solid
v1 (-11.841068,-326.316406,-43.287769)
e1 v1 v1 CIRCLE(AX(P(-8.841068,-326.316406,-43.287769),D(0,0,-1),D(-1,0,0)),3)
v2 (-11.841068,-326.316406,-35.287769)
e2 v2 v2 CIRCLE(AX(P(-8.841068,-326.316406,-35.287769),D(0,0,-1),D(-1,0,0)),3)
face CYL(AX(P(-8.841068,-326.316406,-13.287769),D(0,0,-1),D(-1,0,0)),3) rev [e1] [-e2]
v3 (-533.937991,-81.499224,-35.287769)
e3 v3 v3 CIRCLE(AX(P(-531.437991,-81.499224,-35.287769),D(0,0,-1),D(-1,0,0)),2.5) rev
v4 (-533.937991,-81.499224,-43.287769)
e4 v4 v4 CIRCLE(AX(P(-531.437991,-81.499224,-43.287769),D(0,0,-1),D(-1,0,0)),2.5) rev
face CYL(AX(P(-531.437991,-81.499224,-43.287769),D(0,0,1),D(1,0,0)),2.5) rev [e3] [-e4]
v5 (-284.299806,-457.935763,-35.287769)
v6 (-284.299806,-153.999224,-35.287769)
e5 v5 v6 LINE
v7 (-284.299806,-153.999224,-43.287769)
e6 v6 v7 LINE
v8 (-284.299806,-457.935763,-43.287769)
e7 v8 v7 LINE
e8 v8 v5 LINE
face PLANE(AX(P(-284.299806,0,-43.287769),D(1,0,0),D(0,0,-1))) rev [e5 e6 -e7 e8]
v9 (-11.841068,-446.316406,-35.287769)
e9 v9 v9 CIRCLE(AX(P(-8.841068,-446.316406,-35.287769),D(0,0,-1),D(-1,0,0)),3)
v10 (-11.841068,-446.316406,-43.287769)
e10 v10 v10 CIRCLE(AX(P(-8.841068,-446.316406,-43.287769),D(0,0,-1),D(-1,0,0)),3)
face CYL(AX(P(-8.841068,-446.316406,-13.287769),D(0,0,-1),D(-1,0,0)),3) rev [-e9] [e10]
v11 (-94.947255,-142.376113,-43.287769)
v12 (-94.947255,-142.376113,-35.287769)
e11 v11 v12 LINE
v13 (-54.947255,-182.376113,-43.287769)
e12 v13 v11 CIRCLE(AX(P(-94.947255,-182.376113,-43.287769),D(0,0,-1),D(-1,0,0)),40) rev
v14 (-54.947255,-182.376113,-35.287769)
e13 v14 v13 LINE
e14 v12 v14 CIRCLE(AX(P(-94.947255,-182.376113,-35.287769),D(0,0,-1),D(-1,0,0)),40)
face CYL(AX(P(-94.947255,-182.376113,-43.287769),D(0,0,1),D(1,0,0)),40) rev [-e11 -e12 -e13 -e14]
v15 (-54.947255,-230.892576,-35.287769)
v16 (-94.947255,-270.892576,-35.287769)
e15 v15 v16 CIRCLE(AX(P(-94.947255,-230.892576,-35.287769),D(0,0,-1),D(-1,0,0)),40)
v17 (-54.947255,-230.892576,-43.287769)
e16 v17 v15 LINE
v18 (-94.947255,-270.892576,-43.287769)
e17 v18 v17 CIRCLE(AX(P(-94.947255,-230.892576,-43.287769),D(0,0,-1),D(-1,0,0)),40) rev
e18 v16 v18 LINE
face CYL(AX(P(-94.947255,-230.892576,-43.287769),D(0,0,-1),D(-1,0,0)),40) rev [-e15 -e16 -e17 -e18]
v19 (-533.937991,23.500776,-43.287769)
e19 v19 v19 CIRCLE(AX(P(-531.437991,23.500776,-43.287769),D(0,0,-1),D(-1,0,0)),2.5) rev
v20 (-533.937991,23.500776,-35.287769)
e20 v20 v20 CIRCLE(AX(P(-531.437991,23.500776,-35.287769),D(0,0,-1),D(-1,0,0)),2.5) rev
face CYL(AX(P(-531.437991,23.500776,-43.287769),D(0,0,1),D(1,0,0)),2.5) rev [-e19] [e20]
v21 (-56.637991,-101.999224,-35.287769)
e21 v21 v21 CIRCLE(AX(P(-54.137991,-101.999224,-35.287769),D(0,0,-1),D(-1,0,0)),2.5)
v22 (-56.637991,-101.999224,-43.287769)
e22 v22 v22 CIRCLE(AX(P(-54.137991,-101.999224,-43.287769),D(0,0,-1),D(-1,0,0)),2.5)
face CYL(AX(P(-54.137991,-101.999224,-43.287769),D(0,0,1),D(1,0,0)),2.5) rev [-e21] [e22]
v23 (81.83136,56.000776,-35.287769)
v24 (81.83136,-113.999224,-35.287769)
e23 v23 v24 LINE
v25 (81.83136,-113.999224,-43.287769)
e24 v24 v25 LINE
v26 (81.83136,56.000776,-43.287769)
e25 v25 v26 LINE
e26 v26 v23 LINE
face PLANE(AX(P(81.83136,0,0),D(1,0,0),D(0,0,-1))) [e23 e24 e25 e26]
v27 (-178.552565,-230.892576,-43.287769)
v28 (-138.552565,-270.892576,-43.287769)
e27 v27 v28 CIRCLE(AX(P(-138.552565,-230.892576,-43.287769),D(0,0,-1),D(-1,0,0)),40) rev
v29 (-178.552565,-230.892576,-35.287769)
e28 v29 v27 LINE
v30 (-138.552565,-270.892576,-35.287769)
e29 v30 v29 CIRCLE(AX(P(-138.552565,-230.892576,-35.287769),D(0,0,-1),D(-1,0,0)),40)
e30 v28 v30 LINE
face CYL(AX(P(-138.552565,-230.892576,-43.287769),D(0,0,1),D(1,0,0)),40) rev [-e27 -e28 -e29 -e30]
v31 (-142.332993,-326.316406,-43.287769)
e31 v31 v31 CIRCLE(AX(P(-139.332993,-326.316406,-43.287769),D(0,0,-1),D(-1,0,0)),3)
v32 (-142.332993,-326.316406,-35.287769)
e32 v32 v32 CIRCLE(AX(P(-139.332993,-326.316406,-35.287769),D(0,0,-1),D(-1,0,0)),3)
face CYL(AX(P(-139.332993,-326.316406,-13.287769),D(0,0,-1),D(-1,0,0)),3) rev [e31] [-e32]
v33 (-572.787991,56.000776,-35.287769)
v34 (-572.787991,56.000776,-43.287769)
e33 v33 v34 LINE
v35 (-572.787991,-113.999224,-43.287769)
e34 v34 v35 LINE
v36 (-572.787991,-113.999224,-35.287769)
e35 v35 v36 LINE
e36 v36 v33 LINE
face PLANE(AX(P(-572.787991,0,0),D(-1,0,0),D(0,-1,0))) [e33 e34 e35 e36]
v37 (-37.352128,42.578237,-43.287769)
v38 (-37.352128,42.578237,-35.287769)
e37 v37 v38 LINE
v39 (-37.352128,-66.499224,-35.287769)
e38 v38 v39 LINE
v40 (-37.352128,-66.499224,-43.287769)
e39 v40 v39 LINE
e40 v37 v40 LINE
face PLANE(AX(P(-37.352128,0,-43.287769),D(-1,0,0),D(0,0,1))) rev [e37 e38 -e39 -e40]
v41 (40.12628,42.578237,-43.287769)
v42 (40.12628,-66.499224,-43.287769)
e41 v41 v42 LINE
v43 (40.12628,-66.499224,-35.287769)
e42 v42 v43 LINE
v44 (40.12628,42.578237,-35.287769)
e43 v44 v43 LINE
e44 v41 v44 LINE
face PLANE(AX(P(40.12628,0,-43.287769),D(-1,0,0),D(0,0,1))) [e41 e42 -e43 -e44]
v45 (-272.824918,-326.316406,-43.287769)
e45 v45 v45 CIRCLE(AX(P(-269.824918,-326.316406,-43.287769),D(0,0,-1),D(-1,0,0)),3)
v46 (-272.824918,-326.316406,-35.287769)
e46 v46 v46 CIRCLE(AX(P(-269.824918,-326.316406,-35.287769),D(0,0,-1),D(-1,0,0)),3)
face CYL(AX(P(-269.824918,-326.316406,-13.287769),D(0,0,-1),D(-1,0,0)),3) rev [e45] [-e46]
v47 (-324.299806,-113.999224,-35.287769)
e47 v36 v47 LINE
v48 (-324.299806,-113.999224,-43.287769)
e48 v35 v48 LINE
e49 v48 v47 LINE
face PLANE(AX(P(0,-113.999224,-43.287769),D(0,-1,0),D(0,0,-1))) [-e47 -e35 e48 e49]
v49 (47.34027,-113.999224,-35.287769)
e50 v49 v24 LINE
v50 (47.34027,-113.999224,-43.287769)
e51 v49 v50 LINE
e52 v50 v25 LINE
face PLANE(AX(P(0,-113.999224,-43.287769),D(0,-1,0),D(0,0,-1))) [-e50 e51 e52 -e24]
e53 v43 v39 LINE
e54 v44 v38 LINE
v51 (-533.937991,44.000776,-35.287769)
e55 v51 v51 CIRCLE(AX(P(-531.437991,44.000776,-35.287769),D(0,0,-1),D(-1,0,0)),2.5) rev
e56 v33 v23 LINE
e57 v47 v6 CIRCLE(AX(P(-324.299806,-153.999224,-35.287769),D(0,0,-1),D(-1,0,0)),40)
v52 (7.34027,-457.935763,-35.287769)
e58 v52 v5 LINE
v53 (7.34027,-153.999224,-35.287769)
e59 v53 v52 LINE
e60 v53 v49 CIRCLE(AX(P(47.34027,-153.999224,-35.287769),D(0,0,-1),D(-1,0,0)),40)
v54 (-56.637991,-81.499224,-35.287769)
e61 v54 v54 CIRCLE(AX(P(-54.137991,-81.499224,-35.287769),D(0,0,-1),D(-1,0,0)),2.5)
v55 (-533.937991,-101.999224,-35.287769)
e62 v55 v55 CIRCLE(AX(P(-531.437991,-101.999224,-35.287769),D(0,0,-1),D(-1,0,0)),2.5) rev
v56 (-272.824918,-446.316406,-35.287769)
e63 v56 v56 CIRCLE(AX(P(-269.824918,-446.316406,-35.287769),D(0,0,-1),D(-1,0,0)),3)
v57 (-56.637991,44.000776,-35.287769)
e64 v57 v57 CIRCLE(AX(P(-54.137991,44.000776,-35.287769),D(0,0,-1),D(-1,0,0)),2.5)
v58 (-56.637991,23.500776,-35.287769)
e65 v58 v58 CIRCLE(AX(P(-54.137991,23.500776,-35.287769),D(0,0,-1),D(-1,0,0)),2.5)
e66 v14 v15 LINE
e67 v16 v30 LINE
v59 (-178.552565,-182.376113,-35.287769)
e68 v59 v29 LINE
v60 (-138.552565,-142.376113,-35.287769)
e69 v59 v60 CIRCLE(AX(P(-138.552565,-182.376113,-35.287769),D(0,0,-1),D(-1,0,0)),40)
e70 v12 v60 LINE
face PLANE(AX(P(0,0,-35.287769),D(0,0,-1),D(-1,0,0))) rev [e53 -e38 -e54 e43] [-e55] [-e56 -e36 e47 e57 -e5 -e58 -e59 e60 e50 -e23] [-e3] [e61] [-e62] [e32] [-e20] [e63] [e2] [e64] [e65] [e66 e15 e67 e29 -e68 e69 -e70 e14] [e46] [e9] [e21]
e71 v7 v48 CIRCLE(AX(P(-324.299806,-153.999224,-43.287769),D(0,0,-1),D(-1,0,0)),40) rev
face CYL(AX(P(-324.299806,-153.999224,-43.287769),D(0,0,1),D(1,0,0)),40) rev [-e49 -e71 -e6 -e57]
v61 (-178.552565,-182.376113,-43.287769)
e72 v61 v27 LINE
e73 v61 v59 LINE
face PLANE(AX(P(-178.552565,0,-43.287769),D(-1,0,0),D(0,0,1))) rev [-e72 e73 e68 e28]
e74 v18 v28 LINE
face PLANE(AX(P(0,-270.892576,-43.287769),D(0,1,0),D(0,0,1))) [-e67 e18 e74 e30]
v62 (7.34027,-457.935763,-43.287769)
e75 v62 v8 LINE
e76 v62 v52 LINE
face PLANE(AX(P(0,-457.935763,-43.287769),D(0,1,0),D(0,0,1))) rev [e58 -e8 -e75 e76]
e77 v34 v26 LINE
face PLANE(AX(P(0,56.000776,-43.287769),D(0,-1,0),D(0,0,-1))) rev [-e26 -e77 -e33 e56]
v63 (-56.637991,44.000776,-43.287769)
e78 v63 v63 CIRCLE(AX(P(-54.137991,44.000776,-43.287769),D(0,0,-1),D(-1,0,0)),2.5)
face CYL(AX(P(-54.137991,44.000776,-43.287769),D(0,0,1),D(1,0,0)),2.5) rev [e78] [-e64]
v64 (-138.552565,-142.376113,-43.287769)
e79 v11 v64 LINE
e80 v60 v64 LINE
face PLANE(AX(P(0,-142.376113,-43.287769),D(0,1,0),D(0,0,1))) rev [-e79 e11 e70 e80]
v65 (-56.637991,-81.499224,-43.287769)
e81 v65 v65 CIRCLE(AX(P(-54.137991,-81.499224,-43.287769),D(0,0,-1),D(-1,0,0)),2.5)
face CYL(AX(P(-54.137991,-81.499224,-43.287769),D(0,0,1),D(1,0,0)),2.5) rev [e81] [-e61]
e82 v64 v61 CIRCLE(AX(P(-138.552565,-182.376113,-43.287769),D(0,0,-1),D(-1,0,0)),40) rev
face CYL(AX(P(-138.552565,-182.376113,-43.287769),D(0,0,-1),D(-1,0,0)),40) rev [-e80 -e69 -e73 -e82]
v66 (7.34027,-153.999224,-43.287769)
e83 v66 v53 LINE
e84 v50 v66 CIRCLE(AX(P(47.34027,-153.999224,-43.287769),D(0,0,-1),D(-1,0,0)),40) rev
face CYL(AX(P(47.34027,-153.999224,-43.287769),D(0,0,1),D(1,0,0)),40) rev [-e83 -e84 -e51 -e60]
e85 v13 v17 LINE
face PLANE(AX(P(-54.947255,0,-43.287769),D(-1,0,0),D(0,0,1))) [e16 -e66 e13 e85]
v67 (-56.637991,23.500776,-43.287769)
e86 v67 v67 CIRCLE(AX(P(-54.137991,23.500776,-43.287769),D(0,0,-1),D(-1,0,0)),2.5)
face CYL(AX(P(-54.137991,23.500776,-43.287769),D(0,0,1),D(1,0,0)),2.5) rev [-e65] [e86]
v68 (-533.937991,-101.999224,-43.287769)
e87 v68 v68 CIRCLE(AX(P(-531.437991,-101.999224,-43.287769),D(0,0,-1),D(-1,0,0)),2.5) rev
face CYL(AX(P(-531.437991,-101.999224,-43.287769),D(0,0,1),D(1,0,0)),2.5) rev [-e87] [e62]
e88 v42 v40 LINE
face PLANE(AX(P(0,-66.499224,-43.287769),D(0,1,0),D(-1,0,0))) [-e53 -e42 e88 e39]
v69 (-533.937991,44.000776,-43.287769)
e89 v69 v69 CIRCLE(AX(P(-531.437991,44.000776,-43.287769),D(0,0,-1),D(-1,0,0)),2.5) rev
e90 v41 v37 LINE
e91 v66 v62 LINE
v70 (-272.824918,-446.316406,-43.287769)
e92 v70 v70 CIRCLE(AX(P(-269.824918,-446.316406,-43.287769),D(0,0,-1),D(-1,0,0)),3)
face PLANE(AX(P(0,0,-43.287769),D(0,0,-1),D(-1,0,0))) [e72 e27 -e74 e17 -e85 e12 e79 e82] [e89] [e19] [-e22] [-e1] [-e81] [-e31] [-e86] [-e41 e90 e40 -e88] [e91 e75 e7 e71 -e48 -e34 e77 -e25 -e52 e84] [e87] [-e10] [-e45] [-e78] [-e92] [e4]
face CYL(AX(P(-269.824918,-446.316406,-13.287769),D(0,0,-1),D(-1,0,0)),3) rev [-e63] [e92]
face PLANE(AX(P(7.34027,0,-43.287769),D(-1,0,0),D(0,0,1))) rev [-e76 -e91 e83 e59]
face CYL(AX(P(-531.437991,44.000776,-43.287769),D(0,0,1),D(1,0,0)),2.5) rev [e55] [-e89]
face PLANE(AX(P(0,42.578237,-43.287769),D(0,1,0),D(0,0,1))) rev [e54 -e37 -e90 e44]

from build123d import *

# Parameters (mm, degrees)
CROQUIS1_R              = 2.5
CROQUIS1_W              = 77.478408342
CROQUIS1_H              = 109.077461589
CROQUIS1_W_2            = 123.605310211
CROQUIS1_H_2            = 128.516462854
SALIENTE_EXTRUIR1_DEPTH = 8
REDONDEO1_R             = 40
CROQUIS2_W              = 8
CROQUIS2_H              = 170
SALIENTE_EXTRUIR2_DEPTH = 5
CROQUIS3_W              = 8
CROQUIS3_H              = 170
SALIENTE_EXTRUIR3_DEPTH = 30
CROQUIS4_W              = 8
CROQUIS4_H              = 170
SALIENTE_EXTRUIR4_DEPTH = 30
CROQUIS5_R              = 3
CORTAR_EXTRUIR1_DEPTH   = 30


with BuildPart() as part:
    # Croquis1 → Saliente-Extruir1 (new body)
    with BuildSketch(Plane(origin=(0, 0, -35.287768798), x_dir=(-1, 0, 0), z_dir=(0, 0, -1))):
        Polygon((537.787991057, -113.999224426), (537.787991057, 56.000775574), (-51.831359741, 56.000775574), (-51.831359741, -113.999224426), (-7.340270166, -113.999224426), (-7.340270166, -457.935763063), (284.299805756, -457.935763063), (284.299805756, -113.999224426), align=None)
        with Locations((531.437991057, -101.999224426)):
            Circle(CROQUIS1_R, mode=Mode.SUBTRACT)
        with Locations((531.437991057, -81.499224426)):
            Circle(CROQUIS1_R, mode=Mode.SUBTRACT)
        with Locations((531.437991057, 23.500775574)):
            Circle(CROQUIS1_R, mode=Mode.SUBTRACT)
        with Locations((531.437991057, 44.000775574)):
            Circle(CROQUIS1_R, mode=Mode.SUBTRACT)
        with Locations((54.137991057, 44.000775574)):
            Circle(CROQUIS1_R, mode=Mode.SUBTRACT)
        with Locations((54.137991057, -101.999224426)):
            Circle(CROQUIS1_R, mode=Mode.SUBTRACT)
        with Locations((54.137991057, -81.499224426)):
            Circle(CROQUIS1_R, mode=Mode.SUBTRACT)
        with Locations((-1.387076296, -11.960493631)):
            Rectangle(CROQUIS1_W, CROQUIS1_H, mode=Mode.SUBTRACT)
        with Locations((54.137991057, 23.500775574)):
            Circle(CROQUIS1_R, mode=Mode.SUBTRACT)
        with Locations((116.749910344, -206.634344557)):
            Rectangle(CROQUIS1_W_2, CROQUIS1_H_2, mode=Mode.SUBTRACT)
    extrude(amount=SALIENTE_EXTRUIR1_DEPTH)

    # Redondeo1
    redondeo1_edges = [part.edges().sort_by_distance(p)[0] for p in [
        (-54.947255239, -270.892575984, -39.287768798),
        (-178.55256545, -270.892575984, -39.287768798),
        (-178.55256545, -142.37611313, -39.287768798),
        (-54.947255239, -142.37611313, -39.287768798),
        (7.340270166, -113.999224426, -39.287768798),
        (-284.299805756, -113.999224426, -39.287768798),
    ]]
    fillet(redondeo1_edges, radius=REDONDEO1_R)

    # Croquis2 → Saliente-Extruir2 (add)
    with BuildSketch(Plane.ZY.offset(537.787991057)):
        with Locations((-39.287768798, -28.999224426)):
            Rectangle(CROQUIS2_W, CROQUIS2_H)
    extrude(amount=SALIENTE_EXTRUIR2_DEPTH)

    # Croquis3 → Saliente-Extruir3 (add)
    with BuildSketch(Plane.ZY.offset(542.787991057)):
        with Locations((-39.287768798, -28.999224426)):
            Rectangle(CROQUIS3_W, CROQUIS3_H)
    extrude(amount=SALIENTE_EXTRUIR3_DEPTH)

    # Croquis4 → Saliente-Extruir4 (add)
    with BuildSketch(Plane(origin=(51.831359741, 0, 0), x_dir=(0, 0, -1), z_dir=(1, 0, 0))):
        with Locations((39.287768798, -28.999224426)):
            Rectangle(CROQUIS4_W, CROQUIS4_H)
    extrude(amount=SALIENTE_EXTRUIR4_DEPTH)

    # Croquis5 → Cortar-Extruir1 (cut)
    with BuildSketch(Plane(origin=(0, 0, -43.287768798), x_dir=(-1, 0, 0), z_dir=(0, 0, -1))):
        with Locations((8.841068429, -446.316406302)):
            Circle(CROQUIS5_R)
        with Locations((8.841068429, -326.316406302)):
            Circle(CROQUIS5_R)
        with Locations((139.33299328, -326.316406302)):
            Circle(CROQUIS5_R)
        with Locations((269.824918132, -326.316406302)):
            Circle(CROQUIS5_R)
        with Locations((269.824918132, -446.316406302)):
            Circle(CROQUIS5_R)
    extrude(amount=-CORTAR_EXTRUIR1_DEPTH, mode=Mode.SUBTRACT)


solid = part.part
